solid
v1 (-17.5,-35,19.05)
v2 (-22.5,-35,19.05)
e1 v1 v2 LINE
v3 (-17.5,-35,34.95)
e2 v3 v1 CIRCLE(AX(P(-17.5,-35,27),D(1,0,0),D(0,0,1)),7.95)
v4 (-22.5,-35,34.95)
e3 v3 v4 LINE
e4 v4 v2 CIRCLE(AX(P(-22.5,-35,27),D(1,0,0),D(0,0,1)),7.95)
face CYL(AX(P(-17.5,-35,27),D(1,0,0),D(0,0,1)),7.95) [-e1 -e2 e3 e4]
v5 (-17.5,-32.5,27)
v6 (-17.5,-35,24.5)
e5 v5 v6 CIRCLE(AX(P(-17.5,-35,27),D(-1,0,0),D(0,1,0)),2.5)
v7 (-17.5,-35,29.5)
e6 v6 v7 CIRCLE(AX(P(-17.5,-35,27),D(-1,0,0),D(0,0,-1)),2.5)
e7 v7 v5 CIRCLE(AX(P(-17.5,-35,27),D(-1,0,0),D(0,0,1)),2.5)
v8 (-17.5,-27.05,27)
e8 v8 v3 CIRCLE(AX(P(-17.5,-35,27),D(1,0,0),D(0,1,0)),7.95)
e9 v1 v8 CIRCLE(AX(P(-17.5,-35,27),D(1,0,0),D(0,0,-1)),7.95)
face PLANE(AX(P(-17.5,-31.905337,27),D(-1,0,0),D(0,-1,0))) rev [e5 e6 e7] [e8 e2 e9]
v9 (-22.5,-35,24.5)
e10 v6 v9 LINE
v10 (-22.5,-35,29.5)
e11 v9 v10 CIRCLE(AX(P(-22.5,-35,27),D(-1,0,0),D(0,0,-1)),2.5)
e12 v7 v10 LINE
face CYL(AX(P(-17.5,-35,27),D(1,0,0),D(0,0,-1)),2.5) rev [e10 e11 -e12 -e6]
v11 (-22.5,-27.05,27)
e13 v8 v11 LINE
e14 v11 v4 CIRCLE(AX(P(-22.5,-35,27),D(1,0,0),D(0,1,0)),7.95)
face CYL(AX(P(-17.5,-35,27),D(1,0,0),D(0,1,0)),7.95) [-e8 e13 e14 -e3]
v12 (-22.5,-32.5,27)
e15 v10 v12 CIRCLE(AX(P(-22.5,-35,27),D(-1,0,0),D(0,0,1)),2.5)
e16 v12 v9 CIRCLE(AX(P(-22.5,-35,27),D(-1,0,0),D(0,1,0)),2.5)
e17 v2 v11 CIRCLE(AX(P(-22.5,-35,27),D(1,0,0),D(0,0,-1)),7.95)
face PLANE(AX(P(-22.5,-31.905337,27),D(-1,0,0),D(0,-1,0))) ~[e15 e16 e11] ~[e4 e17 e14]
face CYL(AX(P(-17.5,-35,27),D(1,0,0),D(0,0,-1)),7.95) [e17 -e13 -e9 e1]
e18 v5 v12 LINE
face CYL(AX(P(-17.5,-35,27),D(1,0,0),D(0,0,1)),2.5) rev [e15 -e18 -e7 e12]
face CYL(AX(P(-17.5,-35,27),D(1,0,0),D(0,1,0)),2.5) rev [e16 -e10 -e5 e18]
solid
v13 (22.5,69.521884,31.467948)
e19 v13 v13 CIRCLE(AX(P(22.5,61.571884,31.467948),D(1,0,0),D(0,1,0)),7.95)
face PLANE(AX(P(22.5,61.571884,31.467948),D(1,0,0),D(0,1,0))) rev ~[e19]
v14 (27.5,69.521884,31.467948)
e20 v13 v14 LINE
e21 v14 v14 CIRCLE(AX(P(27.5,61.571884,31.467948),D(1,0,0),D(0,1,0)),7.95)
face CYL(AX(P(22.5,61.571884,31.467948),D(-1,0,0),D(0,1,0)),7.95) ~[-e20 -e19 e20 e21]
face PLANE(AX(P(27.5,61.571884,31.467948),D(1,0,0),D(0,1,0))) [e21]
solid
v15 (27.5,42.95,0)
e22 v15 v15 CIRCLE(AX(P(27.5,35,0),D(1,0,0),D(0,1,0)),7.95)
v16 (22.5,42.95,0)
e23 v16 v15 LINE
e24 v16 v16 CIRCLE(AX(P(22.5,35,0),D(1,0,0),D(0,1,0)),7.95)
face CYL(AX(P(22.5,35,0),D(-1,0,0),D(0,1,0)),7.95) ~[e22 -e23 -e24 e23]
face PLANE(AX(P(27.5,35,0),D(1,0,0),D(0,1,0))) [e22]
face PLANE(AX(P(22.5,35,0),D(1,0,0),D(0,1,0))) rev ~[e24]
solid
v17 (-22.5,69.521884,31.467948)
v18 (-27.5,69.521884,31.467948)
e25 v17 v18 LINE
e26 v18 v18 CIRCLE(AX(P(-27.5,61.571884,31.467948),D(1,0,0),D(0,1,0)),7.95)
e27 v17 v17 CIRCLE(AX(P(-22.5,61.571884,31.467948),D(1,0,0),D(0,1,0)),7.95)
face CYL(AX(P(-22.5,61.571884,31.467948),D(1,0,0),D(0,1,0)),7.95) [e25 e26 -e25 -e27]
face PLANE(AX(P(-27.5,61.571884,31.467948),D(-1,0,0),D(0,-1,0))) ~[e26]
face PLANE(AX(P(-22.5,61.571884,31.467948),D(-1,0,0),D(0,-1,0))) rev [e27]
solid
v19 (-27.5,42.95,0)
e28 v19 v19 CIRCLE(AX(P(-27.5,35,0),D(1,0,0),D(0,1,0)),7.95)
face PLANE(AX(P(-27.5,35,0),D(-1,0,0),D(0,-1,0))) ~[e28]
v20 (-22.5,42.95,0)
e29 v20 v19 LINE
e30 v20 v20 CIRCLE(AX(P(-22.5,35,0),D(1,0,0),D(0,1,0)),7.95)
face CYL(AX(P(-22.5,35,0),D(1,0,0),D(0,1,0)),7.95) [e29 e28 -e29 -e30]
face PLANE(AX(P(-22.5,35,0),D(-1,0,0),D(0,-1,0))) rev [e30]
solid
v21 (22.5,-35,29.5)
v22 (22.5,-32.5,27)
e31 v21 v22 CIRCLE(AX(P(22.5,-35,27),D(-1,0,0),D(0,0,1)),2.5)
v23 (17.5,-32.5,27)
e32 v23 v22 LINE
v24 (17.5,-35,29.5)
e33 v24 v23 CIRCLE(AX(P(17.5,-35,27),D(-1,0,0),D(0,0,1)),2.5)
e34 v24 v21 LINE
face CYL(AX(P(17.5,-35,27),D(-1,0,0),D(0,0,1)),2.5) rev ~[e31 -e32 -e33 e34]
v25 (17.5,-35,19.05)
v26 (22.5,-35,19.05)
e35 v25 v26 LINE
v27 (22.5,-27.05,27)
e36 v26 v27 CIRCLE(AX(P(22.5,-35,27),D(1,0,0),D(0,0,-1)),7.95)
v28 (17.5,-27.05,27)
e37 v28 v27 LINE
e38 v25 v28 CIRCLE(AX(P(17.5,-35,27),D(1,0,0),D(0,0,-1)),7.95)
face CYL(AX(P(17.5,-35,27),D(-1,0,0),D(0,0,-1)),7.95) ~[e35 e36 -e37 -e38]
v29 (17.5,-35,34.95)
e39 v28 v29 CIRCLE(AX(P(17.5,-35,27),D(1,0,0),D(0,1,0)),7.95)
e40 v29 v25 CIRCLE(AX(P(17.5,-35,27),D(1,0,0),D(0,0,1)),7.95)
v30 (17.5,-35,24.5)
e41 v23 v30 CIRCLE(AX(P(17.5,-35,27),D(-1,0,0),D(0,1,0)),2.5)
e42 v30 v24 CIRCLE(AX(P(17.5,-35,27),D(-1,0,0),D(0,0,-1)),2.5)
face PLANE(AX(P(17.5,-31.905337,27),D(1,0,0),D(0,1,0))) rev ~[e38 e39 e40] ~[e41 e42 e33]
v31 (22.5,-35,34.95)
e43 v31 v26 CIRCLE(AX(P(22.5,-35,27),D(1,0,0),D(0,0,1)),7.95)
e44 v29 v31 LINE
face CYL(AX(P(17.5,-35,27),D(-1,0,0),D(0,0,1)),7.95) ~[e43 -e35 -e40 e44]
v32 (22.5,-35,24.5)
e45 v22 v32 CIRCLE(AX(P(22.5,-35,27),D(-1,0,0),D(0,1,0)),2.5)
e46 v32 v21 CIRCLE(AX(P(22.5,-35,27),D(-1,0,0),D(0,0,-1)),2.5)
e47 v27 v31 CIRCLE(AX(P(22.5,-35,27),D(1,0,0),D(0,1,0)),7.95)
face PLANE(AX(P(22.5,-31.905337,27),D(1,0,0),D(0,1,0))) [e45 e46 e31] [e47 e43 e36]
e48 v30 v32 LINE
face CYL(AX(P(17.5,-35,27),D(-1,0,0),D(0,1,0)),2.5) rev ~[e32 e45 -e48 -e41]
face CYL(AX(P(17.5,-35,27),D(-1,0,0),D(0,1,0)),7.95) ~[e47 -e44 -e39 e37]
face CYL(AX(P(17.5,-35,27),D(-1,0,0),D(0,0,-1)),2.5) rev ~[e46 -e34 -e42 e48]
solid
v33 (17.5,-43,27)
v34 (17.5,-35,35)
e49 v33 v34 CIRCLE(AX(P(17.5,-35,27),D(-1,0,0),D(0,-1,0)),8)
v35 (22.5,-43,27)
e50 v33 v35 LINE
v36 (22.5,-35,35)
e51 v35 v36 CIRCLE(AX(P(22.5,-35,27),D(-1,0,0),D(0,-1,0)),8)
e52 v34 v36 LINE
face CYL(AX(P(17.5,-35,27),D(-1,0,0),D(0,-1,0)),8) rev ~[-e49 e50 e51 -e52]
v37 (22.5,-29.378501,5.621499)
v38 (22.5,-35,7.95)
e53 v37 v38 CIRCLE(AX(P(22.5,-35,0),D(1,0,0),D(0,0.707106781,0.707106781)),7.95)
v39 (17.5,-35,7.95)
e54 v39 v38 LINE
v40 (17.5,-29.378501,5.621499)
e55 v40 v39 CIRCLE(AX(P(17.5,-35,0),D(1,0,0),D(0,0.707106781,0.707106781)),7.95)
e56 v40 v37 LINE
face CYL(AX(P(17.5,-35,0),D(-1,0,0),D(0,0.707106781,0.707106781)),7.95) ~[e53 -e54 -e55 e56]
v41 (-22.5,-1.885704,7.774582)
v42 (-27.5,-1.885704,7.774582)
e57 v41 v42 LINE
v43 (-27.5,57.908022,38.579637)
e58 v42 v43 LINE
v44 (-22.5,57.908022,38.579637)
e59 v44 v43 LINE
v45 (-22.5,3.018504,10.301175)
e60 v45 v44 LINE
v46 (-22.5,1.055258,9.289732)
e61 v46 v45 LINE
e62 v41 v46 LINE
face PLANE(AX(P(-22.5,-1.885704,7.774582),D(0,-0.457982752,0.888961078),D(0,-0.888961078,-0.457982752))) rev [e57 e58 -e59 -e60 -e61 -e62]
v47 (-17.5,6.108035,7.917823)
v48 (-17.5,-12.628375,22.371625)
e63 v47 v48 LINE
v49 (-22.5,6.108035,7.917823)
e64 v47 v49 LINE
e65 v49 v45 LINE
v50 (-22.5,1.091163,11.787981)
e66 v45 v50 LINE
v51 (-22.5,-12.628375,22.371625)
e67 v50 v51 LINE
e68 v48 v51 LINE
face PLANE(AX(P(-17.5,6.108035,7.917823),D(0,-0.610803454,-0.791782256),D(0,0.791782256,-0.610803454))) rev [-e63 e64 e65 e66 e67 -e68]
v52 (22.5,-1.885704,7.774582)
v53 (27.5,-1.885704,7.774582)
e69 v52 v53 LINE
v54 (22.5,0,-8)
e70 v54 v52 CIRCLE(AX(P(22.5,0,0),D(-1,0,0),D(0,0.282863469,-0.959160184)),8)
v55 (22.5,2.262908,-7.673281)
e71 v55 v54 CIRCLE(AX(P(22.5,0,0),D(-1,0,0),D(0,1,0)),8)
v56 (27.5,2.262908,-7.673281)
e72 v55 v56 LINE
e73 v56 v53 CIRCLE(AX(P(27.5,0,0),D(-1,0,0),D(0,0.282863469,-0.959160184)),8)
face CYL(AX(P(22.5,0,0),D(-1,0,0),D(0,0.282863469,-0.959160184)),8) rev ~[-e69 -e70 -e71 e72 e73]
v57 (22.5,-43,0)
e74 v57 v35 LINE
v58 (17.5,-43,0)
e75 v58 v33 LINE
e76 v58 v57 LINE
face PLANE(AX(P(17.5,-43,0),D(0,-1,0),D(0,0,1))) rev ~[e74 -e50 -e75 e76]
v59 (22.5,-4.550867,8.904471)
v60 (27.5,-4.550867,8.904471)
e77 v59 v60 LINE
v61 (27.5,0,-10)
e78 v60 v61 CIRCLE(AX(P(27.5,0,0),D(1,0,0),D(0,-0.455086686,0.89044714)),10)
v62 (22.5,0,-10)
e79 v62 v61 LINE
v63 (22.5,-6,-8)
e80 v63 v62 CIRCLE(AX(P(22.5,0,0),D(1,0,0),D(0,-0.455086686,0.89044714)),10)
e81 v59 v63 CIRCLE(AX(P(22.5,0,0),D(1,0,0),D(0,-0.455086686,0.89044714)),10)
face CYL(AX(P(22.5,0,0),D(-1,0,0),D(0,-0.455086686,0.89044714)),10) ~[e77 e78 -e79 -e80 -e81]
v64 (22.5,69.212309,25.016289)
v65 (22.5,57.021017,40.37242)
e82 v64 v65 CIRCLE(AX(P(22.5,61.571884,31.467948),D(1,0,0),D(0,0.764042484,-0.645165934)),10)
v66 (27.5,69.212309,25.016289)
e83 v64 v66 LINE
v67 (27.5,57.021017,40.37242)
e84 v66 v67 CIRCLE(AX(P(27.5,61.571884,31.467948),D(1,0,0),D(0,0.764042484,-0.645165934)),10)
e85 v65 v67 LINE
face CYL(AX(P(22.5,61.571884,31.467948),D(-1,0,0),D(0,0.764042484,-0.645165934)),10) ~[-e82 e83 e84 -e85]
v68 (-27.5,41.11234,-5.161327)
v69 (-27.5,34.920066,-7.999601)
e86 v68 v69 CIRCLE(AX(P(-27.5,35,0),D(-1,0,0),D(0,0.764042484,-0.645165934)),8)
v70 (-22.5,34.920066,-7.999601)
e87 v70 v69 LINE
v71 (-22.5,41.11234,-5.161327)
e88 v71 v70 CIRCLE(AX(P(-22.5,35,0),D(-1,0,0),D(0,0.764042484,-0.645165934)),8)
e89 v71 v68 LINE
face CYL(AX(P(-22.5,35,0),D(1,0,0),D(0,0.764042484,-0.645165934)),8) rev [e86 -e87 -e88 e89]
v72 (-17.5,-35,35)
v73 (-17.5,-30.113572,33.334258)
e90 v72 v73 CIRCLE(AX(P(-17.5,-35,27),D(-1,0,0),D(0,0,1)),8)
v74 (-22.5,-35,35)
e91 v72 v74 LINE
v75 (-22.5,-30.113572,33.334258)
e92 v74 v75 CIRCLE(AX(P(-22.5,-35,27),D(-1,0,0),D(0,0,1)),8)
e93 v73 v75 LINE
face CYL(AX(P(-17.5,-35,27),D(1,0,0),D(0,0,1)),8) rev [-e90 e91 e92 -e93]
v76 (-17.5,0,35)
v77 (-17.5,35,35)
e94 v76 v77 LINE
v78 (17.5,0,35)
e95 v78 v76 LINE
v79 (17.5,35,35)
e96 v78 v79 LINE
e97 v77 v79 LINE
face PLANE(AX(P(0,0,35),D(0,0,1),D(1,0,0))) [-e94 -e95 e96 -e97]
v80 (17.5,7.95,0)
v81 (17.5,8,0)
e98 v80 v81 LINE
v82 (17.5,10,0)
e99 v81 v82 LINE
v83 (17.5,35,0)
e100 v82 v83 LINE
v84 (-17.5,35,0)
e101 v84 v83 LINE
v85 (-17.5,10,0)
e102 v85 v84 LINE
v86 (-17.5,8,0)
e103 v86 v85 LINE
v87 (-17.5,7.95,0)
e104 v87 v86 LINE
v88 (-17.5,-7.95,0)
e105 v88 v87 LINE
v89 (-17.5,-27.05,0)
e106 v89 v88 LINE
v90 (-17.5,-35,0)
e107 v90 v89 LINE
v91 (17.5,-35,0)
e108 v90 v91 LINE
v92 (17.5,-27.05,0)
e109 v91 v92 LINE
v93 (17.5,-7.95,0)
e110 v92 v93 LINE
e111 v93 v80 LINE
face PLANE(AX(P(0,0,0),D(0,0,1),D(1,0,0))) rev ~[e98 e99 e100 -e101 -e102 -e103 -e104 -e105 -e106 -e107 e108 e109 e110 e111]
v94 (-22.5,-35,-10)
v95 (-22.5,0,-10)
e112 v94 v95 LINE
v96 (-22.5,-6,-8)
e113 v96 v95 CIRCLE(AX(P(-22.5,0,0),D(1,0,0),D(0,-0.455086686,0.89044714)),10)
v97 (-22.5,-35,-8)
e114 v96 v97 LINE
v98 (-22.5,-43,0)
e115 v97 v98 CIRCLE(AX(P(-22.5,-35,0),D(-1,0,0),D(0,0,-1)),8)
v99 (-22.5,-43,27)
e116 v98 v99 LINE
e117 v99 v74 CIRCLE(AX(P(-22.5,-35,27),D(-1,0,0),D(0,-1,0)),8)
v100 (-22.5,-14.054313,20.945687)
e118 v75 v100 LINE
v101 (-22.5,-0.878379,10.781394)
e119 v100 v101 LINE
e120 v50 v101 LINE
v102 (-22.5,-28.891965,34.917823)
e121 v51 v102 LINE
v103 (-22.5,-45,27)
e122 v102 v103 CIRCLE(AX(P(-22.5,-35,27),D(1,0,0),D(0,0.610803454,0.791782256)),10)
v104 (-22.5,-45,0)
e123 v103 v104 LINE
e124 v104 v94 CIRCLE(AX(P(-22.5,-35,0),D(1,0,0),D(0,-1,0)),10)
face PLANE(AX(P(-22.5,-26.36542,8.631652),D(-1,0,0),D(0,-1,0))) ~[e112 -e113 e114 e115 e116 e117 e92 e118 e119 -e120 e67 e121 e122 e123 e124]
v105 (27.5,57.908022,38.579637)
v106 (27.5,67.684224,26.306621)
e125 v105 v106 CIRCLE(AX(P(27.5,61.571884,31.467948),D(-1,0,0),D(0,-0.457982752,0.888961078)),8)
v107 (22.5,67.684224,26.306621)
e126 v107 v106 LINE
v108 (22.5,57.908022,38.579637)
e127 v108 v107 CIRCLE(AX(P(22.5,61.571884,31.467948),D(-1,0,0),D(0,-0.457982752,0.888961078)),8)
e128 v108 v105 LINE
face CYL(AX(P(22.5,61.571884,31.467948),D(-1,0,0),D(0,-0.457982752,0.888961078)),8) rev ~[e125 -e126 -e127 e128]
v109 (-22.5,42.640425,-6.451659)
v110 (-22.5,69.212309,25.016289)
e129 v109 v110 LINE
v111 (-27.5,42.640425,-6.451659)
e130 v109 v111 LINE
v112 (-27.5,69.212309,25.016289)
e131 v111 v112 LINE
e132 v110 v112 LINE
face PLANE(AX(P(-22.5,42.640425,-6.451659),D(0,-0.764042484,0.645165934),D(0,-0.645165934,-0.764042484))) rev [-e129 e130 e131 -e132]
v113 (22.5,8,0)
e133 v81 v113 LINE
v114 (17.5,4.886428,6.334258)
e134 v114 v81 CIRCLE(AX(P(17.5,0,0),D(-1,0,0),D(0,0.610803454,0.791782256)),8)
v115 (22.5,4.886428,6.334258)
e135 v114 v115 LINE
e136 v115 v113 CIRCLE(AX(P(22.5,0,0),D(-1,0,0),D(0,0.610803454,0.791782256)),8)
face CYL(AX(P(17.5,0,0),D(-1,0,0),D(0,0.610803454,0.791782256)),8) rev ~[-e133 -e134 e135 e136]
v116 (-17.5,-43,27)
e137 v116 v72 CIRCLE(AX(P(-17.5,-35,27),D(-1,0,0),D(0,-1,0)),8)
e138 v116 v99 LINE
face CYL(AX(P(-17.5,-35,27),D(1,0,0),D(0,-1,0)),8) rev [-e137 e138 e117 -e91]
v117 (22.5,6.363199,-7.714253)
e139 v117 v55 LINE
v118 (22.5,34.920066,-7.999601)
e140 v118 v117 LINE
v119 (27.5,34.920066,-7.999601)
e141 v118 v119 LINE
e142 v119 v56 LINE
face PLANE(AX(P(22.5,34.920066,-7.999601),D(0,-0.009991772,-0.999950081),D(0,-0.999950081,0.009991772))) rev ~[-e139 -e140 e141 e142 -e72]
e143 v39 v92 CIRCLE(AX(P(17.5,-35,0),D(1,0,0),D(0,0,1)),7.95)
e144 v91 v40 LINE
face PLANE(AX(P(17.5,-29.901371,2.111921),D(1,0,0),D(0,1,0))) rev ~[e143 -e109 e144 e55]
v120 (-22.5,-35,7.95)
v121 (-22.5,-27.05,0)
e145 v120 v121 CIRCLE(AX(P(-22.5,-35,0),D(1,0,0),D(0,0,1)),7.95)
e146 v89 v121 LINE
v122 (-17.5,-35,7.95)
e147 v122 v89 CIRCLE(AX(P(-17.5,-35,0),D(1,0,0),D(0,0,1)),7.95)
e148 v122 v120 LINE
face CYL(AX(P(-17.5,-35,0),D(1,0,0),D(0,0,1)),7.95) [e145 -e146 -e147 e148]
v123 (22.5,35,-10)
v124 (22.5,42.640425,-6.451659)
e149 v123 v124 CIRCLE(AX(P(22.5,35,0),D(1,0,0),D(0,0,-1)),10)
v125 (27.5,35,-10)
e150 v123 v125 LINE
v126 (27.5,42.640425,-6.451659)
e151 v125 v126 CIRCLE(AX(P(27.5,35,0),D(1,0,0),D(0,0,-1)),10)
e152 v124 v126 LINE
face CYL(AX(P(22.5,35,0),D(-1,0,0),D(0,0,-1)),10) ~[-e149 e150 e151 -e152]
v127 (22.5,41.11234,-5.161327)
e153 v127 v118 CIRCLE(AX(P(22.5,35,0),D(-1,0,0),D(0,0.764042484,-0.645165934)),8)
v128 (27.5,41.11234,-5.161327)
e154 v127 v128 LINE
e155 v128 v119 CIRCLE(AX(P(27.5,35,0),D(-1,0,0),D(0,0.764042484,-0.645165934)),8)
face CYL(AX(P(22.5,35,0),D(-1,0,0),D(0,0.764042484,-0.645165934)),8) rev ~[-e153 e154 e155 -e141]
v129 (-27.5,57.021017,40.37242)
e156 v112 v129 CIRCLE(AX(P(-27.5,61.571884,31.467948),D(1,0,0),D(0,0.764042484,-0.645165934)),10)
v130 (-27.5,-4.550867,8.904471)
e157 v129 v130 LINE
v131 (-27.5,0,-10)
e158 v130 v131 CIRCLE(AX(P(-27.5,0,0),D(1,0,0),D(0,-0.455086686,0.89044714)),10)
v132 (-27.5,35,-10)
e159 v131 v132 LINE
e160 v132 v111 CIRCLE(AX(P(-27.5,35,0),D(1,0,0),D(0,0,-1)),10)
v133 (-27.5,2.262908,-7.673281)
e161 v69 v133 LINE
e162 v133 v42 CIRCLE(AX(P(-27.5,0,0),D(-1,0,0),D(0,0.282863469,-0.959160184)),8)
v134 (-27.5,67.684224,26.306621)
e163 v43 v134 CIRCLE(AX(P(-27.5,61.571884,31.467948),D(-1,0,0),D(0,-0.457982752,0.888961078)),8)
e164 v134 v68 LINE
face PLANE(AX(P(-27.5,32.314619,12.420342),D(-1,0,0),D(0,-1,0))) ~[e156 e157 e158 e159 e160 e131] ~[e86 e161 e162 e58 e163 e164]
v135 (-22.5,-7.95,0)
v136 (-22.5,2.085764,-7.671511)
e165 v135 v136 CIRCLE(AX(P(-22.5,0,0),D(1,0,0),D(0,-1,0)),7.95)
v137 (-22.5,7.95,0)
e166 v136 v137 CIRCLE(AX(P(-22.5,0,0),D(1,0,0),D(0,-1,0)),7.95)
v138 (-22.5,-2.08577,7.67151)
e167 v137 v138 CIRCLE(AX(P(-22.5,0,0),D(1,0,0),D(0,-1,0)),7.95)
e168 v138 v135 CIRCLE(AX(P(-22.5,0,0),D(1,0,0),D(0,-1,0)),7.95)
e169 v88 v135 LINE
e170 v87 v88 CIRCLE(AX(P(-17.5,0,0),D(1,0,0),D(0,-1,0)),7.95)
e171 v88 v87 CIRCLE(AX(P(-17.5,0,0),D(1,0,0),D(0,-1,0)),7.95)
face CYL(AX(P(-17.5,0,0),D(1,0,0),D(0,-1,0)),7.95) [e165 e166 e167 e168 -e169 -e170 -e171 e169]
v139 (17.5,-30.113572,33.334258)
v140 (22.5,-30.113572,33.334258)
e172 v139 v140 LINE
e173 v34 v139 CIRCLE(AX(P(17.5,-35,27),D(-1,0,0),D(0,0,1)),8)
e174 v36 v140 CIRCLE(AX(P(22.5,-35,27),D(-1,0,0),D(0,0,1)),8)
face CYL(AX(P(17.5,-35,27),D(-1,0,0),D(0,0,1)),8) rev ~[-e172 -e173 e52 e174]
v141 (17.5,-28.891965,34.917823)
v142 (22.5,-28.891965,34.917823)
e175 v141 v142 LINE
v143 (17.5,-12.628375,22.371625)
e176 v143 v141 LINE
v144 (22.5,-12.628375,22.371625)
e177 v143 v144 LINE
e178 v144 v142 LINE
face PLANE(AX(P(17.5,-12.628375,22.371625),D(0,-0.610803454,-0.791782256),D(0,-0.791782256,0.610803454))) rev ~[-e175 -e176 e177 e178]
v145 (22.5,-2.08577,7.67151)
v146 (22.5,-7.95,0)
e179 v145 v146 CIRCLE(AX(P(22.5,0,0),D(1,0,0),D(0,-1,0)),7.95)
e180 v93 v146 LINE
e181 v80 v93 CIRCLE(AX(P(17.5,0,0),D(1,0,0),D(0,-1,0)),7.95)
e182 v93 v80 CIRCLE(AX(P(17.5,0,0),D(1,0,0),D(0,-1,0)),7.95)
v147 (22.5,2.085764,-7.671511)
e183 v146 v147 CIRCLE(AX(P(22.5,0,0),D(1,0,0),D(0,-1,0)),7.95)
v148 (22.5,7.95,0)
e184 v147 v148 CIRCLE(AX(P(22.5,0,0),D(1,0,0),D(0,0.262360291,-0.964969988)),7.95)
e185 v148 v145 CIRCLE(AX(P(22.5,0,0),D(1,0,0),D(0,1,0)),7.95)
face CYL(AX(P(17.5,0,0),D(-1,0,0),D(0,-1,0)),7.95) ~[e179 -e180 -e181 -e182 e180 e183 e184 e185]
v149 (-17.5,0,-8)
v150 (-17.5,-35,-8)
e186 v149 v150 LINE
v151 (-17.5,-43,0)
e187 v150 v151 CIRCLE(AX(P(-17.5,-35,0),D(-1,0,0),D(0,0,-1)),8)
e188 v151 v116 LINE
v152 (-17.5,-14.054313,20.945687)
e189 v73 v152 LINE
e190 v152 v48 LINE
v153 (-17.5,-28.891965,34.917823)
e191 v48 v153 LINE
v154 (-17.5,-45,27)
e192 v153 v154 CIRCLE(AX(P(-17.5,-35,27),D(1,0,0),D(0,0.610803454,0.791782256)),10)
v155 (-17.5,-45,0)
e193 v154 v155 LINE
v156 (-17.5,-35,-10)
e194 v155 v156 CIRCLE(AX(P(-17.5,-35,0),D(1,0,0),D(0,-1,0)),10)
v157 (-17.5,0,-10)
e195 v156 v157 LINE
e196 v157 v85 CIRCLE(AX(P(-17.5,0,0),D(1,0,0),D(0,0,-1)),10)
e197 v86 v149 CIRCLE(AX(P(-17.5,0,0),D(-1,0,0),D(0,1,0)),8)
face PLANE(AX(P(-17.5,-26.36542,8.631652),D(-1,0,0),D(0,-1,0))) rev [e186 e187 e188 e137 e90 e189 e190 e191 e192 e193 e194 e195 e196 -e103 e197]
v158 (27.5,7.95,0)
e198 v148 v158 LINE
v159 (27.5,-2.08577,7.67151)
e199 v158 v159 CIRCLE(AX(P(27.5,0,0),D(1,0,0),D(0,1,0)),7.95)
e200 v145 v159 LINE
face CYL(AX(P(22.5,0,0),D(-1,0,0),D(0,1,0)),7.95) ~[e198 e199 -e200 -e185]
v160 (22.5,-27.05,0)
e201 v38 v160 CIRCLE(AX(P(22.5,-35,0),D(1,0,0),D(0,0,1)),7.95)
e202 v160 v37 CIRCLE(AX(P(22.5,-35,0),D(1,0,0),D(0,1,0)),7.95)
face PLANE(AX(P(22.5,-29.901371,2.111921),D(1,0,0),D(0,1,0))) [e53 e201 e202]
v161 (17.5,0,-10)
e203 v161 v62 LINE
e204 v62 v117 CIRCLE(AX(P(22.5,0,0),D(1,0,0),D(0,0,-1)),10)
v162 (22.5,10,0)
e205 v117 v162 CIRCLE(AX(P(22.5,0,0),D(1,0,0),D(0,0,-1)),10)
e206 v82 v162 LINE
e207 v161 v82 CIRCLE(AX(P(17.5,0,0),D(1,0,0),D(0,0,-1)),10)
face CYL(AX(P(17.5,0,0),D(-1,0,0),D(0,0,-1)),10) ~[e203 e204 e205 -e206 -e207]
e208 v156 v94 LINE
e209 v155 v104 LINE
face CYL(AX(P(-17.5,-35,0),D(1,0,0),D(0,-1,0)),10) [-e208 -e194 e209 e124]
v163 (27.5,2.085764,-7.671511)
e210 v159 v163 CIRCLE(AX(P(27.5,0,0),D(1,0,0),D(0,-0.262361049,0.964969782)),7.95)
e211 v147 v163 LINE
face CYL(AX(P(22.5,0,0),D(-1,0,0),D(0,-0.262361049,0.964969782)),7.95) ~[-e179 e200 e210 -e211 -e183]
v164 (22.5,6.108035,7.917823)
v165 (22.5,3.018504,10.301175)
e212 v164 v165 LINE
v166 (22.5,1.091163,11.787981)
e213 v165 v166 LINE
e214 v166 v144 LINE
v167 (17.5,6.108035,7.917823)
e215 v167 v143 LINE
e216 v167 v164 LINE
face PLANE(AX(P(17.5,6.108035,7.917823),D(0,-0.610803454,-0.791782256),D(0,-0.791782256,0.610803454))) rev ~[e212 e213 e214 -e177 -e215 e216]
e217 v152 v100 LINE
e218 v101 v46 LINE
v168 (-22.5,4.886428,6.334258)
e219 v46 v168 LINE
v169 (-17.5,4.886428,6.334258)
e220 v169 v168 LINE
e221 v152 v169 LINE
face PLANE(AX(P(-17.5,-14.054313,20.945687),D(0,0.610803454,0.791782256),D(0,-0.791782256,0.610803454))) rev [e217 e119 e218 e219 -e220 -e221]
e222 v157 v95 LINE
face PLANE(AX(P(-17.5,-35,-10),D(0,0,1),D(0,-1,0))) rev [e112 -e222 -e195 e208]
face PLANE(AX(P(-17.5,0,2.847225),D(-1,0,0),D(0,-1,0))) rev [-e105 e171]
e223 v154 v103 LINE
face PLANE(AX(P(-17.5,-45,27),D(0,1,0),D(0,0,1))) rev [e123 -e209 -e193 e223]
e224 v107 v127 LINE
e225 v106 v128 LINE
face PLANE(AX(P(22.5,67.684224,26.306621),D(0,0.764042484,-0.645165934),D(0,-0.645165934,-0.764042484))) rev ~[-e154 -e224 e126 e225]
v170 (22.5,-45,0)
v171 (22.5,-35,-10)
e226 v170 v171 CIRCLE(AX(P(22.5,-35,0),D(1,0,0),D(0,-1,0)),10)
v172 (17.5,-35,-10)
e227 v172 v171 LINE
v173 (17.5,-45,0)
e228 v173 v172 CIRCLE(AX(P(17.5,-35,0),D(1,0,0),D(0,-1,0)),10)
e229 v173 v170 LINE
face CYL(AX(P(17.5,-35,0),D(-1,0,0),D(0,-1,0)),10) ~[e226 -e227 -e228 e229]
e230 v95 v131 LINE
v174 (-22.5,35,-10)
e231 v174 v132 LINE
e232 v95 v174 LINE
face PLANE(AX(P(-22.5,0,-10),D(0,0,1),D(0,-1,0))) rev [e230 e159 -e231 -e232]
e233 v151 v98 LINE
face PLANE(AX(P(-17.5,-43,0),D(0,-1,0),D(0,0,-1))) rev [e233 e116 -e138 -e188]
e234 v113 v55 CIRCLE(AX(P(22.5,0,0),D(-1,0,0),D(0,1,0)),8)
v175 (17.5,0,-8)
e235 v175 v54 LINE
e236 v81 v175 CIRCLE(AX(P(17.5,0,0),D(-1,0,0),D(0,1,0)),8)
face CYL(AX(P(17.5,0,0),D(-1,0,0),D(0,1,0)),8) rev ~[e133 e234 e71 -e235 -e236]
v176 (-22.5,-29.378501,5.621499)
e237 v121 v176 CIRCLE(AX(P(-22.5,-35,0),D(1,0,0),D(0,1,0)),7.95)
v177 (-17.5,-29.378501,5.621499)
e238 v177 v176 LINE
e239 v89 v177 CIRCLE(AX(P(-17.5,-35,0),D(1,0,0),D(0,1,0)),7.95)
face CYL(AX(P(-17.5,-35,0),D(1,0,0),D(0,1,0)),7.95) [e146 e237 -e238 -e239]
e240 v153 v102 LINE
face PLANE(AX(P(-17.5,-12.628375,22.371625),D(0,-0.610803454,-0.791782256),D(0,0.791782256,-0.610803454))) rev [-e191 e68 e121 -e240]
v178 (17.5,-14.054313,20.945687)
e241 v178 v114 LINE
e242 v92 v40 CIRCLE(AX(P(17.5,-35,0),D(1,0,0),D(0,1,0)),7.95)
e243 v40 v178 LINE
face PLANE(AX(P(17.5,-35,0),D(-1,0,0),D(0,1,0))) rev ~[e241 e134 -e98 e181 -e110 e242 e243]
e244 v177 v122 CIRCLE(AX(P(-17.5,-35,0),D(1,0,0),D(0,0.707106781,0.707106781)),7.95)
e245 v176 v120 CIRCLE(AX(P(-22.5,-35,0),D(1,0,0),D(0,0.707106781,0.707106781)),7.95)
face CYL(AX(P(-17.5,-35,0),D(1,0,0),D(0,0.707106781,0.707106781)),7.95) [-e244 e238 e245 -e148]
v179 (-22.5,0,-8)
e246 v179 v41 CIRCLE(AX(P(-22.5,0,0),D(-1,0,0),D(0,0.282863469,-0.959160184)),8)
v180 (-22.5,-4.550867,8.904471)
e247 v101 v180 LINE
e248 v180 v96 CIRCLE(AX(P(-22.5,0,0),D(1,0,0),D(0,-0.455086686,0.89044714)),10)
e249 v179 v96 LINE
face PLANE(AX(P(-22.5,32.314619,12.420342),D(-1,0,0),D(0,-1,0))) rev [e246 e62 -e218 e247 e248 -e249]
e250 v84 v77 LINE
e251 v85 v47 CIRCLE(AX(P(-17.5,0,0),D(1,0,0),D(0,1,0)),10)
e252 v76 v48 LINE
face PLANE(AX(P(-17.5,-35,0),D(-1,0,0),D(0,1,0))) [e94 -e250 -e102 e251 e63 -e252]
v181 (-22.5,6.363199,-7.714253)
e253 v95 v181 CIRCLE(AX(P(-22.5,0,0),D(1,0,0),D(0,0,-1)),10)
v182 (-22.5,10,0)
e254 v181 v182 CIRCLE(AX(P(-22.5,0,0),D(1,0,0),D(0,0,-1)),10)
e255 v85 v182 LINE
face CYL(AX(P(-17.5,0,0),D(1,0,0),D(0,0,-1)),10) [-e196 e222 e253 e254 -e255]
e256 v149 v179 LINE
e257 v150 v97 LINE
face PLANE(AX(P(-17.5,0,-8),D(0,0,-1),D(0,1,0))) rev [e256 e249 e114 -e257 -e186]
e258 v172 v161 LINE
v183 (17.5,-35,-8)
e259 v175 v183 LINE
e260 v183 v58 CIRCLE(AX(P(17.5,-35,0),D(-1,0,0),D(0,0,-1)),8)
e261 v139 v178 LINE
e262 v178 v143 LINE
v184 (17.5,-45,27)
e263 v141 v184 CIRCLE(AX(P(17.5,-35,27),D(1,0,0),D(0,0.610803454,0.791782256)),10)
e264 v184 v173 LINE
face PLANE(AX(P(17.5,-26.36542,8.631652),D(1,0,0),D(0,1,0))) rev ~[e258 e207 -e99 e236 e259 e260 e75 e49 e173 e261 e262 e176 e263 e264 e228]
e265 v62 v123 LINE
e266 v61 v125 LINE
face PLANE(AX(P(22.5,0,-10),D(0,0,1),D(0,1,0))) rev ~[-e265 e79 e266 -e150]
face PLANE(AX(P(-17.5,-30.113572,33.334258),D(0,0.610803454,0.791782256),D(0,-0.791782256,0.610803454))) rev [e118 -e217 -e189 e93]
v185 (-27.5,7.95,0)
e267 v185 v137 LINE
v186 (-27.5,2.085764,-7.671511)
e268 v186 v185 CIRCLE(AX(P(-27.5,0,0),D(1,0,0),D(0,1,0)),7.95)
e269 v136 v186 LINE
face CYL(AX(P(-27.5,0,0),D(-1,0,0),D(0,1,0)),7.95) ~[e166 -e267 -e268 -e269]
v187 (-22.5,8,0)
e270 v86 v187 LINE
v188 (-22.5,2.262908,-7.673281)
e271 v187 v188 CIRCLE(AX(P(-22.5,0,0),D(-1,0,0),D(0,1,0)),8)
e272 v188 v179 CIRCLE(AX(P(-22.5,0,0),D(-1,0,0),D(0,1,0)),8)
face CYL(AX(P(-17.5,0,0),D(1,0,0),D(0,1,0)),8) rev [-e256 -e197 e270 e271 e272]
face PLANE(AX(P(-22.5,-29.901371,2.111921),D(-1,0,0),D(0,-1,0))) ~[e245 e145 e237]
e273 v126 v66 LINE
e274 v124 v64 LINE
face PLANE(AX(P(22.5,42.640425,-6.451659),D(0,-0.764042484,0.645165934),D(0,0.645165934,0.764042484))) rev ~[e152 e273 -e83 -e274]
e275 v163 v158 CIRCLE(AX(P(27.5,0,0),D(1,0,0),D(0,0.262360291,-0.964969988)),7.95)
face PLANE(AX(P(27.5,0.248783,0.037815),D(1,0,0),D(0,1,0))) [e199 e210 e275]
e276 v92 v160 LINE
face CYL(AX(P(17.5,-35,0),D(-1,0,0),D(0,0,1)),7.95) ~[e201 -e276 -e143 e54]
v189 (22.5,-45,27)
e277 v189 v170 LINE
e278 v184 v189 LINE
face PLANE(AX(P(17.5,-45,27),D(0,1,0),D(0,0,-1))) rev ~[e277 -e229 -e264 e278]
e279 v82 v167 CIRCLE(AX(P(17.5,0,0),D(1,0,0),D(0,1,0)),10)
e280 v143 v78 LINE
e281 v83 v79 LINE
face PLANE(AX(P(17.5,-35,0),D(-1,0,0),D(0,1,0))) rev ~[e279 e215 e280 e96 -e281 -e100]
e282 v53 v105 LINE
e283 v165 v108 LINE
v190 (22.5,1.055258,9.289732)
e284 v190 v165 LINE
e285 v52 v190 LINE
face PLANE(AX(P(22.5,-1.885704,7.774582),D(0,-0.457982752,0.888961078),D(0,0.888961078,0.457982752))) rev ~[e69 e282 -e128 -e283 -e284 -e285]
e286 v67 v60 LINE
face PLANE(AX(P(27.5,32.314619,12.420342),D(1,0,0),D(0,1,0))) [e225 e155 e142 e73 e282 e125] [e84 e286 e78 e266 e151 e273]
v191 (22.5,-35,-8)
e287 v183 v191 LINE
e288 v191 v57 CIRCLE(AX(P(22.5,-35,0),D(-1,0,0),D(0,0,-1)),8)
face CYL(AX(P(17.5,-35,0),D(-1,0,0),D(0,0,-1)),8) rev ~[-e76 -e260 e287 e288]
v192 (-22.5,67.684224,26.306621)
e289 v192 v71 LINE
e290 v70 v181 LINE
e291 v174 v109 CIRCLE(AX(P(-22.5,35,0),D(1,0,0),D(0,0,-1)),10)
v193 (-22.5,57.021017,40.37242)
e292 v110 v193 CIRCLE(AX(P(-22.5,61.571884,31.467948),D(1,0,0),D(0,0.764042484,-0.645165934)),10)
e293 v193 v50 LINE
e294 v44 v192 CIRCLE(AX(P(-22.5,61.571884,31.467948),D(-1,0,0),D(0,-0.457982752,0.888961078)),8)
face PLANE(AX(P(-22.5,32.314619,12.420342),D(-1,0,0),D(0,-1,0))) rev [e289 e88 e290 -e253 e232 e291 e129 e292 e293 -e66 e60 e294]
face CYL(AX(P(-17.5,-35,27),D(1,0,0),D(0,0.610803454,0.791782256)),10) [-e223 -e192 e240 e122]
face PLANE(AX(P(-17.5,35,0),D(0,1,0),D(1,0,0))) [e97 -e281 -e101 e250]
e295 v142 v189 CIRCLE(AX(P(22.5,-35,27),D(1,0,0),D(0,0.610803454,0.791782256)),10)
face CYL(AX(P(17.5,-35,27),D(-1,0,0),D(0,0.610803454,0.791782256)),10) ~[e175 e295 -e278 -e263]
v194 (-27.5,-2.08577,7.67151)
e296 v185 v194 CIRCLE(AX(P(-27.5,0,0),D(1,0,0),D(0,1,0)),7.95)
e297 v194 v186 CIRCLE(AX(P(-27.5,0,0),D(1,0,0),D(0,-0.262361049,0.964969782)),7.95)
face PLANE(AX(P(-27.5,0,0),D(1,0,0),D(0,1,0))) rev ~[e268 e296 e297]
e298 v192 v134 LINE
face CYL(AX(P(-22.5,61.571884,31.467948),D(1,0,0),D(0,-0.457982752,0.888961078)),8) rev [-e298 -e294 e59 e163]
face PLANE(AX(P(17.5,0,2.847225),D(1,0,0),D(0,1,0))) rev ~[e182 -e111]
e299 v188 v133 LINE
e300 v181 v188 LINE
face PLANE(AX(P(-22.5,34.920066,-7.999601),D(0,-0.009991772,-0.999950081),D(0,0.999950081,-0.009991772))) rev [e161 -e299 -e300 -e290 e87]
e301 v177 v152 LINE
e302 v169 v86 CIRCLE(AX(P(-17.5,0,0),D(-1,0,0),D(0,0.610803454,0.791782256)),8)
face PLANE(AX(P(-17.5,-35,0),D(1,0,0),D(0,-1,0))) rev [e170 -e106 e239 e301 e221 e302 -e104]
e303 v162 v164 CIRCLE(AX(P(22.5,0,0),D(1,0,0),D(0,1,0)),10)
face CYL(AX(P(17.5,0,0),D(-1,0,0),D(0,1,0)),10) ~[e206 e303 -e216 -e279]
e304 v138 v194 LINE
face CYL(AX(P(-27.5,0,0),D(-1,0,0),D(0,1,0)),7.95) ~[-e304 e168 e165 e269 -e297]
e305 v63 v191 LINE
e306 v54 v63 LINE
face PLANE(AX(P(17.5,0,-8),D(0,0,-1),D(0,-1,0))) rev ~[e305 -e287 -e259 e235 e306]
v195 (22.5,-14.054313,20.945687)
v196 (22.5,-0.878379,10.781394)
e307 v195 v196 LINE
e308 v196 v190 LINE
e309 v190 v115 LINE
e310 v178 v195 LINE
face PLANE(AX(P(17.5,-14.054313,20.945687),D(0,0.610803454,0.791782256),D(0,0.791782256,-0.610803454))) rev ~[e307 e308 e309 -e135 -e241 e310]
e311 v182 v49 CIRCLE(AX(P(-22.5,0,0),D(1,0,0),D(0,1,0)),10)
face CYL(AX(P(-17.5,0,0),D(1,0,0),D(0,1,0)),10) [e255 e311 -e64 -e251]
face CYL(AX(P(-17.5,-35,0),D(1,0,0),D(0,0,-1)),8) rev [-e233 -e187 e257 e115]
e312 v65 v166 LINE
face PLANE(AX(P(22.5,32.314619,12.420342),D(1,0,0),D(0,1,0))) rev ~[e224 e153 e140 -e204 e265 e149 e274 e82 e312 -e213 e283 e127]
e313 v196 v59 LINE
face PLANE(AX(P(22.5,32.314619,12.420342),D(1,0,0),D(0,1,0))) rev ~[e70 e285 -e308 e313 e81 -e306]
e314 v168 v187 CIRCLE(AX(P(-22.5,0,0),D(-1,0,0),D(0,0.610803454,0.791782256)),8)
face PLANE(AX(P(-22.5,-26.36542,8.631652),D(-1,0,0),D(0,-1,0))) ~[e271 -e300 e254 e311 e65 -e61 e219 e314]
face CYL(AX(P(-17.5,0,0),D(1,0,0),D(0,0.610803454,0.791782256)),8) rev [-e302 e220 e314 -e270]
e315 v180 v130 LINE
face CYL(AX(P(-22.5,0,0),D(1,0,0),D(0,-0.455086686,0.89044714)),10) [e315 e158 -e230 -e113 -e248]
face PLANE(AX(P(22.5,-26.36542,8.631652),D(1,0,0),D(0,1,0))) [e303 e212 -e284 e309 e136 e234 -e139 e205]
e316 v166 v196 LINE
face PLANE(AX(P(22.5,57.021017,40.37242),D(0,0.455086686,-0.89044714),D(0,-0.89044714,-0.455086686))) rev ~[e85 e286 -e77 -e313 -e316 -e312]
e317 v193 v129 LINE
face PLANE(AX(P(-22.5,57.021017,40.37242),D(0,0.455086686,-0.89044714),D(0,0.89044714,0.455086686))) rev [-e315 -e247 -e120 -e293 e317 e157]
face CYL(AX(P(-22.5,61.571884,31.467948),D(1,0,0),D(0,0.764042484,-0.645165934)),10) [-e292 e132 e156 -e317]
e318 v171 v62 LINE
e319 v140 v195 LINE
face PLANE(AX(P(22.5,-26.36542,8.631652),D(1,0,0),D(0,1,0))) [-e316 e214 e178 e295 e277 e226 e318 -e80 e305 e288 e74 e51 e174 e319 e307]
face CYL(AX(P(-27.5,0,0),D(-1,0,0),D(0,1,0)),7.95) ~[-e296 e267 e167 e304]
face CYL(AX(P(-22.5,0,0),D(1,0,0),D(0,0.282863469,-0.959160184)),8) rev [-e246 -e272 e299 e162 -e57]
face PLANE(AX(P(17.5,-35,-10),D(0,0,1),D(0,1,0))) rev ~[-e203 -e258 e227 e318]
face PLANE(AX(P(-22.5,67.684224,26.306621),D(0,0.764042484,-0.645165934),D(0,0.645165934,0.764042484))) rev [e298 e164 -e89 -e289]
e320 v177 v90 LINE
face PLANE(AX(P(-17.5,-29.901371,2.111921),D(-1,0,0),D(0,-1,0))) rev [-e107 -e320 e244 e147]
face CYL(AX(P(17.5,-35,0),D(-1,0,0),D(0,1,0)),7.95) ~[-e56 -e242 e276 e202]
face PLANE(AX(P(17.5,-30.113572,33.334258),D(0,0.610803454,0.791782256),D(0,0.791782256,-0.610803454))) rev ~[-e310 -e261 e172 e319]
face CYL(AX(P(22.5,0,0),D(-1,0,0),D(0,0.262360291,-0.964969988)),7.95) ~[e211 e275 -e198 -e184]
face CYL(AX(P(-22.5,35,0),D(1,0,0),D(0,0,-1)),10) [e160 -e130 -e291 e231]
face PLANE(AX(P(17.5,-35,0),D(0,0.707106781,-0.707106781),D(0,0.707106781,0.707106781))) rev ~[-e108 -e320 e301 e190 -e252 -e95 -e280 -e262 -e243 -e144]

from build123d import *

# Parameters (mm, degrees)
F0_W            = 35
F0_H            = 70
F1_DEPTH        = 35
F3_DEPTH        = 35.001
F5_DEPTH        = 5
F6_DEPTH        = 5
F8_R            = 7.95
F9_DEPTH        = 5
F9_COPIES_COUNT = 2
F9_COPIES_PITCH = 61.032778


# Not quite as in the source:
# - a pattern or mirror of a feature is missing from the dataset's text; its kind, count and spacing are read off the source's solid
# - a feature names something its author has since deleted; it is built from what else it names


with BuildPart() as f1:
    # F0 (on Top) → F1 (new body)
    with BuildSketch(Plane.XY):
        Rectangle(F0_W, F0_H)
    extrude(amount=F1_DEPTH)

    # F2 (on face) → F3 (cut, through all)
    with BuildSketch(Plane.YZ.offset(17.5)):
        Polygon((-35, 0), (0, 35), (-35, 35), align=None)
    extrude(amount=-F3_DEPTH, mode=Mode.SUBTRACT)

    # F4 (on face) → F5 (join)
    with BuildSketch(Plane.YZ.offset(17.5)):
        with BuildLine():
            Line((2.5, 0), (7.95, 0))
            ThreePointArc((7.95, 0), (0, 7.95), (-7.95, 0))
            Line((-7.95, 0), (-2.5, 0))
            ThreePointArc((-2.5, 0), (0, 2.5), (2.5, 0))
        make_face()
        with BuildLine():
            ThreePointArc((-7.95, 0), (0, -7.95), (7.95, 0))
            Line((7.95, 0), (2.5, 0))
            ThreePointArc((2.5, 0), (0, -2.5), (-2.5, 0))
            Line((-2.5, 0), (-7.95, 0))
        make_face()
        with BuildLine():
            Line((-2.5, 0), (2.5, 0))
            ThreePointArc((2.5, 0), (0, 2.5), (-2.5, 0))
        make_face()
        with BuildLine():
            ThreePointArc((-2.5, 0), (0, -2.5), (2.5, 0))
            Line((2.5, 0), (-2.5, 0))
        make_face()
        with BuildLine():
            Line((10, 0), (8, 0))
            ThreePointArc((8, 0), (5.6568542495, -5.6568542495), (0, -8))
            Line((0, -8), (-35, -8))
            ThreePointArc((-35, -8), (-40.6568542495, -5.6568542495), (-43, 0))
            Line((-43, 0), (-43, 27))
            ThreePointArc((-43, 27), (-40.6568542495, 32.6568542495), (-35, 35))
            ThreePointArc((-35, 35), (-32.4187274801, 34.5721220393), (-30.1135723657, 33.3342580445))
            Line((-30.1135723657, 33.3342580445), (-14.0543132631, 20.9456867369))
            Line((-14.0543132631, 20.9456867369), (-12.6283754499, 22.3716245501))
            Line((-12.6283754499, 22.3716245501), (-28.8919654571, 34.9178225556))
            ThreePointArc((-28.8919654571, 34.9178225556), (-39.4113294238, 35.9744176811), (-45, 27))
            Line((-45, 27), (-45, 0))
            ThreePointArc((-45, 0), (-42.0710678119, -7.0710678119), (-35, -10))
            Line((-35, -10), (0, -10))
            ThreePointArc((0, -10), (7.0710678119, -7.0710678119), (10, 0))
        make_face()
        with BuildLine():
            ThreePointArc((4.8864276343, 6.3342580445), (7.1795341449, 3.5290635391), (8, 0))
            Line((8, 0), (10, 0))
            ThreePointArc((10, 0), (8.9744176811, 4.4113294238), (6.1080345429, 7.9178225556))
            Line((6.1080345429, 7.9178225556), (-12.6283754499, 22.3716245501))
            Line((-12.6283754499, 22.3716245501), (-14.0543132631, 20.9456867369))
            Line((-14.0543132631, 20.9456867369), (4.8864276343, 6.3342580445))
        make_face()
        with BuildLine():
            Line((-32.5, 0), (-27.05, 0))
            ThreePointArc((-27.05, 0), (-27.6551577165, 3.0423332873), (-29.3785010896, 5.6214989104))
            Line((-29.3785010896, 5.6214989104), (-33.232233047, 1.767766953))
            ThreePointArc((-33.232233047, 1.767766953), (-32.6903011687, 0.9567085809), (-32.5, 0))
        make_face()
        with BuildLine():
            ThreePointArc((-35, 7.95), (-40.6214989104, -5.6214989104), (-27.05, 0))
            Line((-27.05, 0), (-32.5, 0))
            ThreePointArc((-32.5, 0), (-36.767766953, -1.767766953), (-35, 2.5))
            Line((-35, 2.5), (-35, 7.95))
        make_face()
        with BuildLine():
            Line((-33.232233047, 1.767766953), (-29.3785010896, 5.6214989104))
            ThreePointArc((-29.3785010896, 5.6214989104), (-31.9576667127, 7.3448422835), (-35, 7.95))
            Line((-35, 7.95), (-35, 2.5))
            ThreePointArc((-35, 2.5), (-34.0432914191, 2.3096988313), (-33.232233047, 1.767766953))
        make_face()
        with BuildLine():
            Line((-35, 0), (-32.5, 0))
            ThreePointArc((-32.5, 0), (-32.6903011687, 0.9567085809), (-33.232233047, 1.767766953))
            Line((-33.232233047, 1.767766953), (-35, 0))
        make_face()
        with BuildLine():
            ThreePointArc((-35, 2.5), (-36.767766953, -1.767766953), (-32.5, 0))
            Line((-32.5, 0), (-35, 0))
            Line((-35, 0), (-35, 2.5))
        make_face()
        with BuildLine():
            Line((-35, 0), (-33.232233047, 1.767766953))
            ThreePointArc((-33.232233047, 1.767766953), (-34.0432914191, 2.3096988313), (-35, 2.5))
            Line((-35, 2.5), (-35, 0))
        make_face()
    extrude(amount=F5_DEPTH)

    # F4 (on face) → F6 (join)
    with BuildSketch(Plane.YZ.offset(17.5)):
        with BuildLine():
            Line((6.1080345429, 7.9178225556), (-28.8919654571, 34.9178225556))
            ThreePointArc((-28.8919654571, 34.9178225556), (-39.4113294238, 35.9744176811), (-45, 27))
            Line((-45, 27), (-45, 0))
            ThreePointArc((-45, 0), (-42.0710678119, -7.0710678119), (-35, -10))
            Line((-35, -10), (0, -10))
            ThreePointArc((0, -10), (9.4651525491, -3.2265906499), (6.1080345429, 7.9178225556))
        make_face()
        with BuildLine():
            ThreePointArc((-43, 27), (-38.5290635391, 34.1795341449), (-30.1135723657, 33.3342580445))
            Line((-30.1135723657, 33.3342580445), (4.8864276343, 6.3342580445))
            ThreePointArc((4.8864276343, 6.3342580445), (7.5721220393, -2.5812725199), (0, -8))
            Line((0, -8), (-35, -8))
            ThreePointArc((-35, -8), (-40.6568542495, -5.6568542495), (-43, 0))
            Line((-43, 0), (-43, 27))
        make_face(mode=Mode.SUBTRACT)
    extrude(amount=F6_DEPTH)

    # F7: F1, F5 across plane


with BuildPart() as f5:
    # F4 (on face) → F5, piece 2 (new body)
    with BuildSketch(Plane.YZ.offset(17.5)):
        with BuildLine():
            Line((-35, 24.5), (-35, 19.05))
            ThreePointArc((-35, 19.05), (-29.3785010896, 21.3785010896), (-27.05, 27))
            ThreePointArc((-27.05, 27), (-29.3785010896, 32.6214989104), (-35, 34.95))
            Line((-35, 34.95), (-35, 29.5))
            ThreePointArc((-35, 29.5), (-33.232233047, 28.767766953), (-32.5, 27))
            ThreePointArc((-32.5, 27), (-33.232233047, 25.232233047), (-35, 24.5))
        make_face()
        with BuildLine():
            ThreePointArc((-35, 34.95), (-42.95, 27), (-35, 19.05))
            Line((-35, 19.05), (-35, 24.5))
            ThreePointArc((-35, 24.5), (-37.5, 27), (-35, 29.5))
            Line((-35, 29.5), (-35, 34.95))
        make_face()
    extrude(amount=F5_DEPTH)


with BuildPart() as f1_1:
    add(f1.part)
    add(f1.part.mirror(Plane.YZ))
    add(f5.part.mirror(Plane.YZ))

    # F8 (on face) → F9, piece 3 (join)
    with BuildSketch(Plane.YZ.offset(22.5)):
        with BuildLine():
            Line((57.0210172366, 40.3724198063), (-4.5508668554, 8.9044713972))
            ThreePointArc((-4.5508668554, 8.9044713972), (-9.7222608989, -2.3404365007), (0, -10))
            Line((0, -10), (35, -10))
            ThreePointArc((35, -10), (39.2120901339, -9.0696359742), (42.640424841, -6.4516593408))
            Line((42.640424841, -6.4516593408), (69.2123089329, 25.0162890683))
            ThreePointArc((69.2123089329, 25.0162890683), (69.4038078625, 37.6857430384), (57.0210172366, 40.3724198063))
        make_face()
        with BuildLine():
            ThreePointArc((57.9080220764, 38.5796370363), (67.8293190298, 36.4523749557), (67.6842239647, 26.3066209364))
            Line((67.6842239647, 26.3066209364), (41.1123398728, -5.1613274726))
            ThreePointArc((41.1123398728, -5.1613274726), (38.3333809066, -7.2724529378), (34.920065821, -7.999600648))
            Line((34.920065821, -7.999600648), (2.2629077537, -7.6732814687))
            ThreePointArc((2.2629077537, -7.6732814687), (-7.7262338594, -2.0749241795), (-1.8857040225, 7.7745816826))
            Line((-1.8857040225, 7.7745816826), (57.9080220764, 38.5796370363))
        make_face(mode=Mode.SUBTRACT)
        with BuildLine():
            ThreePointArc((7.95, 0), (4.8280754869, 6.3160262106), (-2.0857703378, 7.6715097665))
            ThreePointArc((-2.0857703378, 7.6715097665), (-7.671510585, -2.0857673274), (2.0857643171, -7.6715114035))
            ThreePointArc((2.0857643171, -7.6715114035), (6.316024316, -4.8280779654), (7.95, 0))
        make_face()
    extrude(amount=F9_DEPTH)

    # F9_copies: F9 ×2


with BuildPart() as f9:
    # F8 (on face) → F9 (new body)
    with BuildSketch(Plane.YZ.offset(22.5)):
        with Locations((35, 0)):
            Circle(F8_R)
    extrude(amount=F9_DEPTH)


with BuildPart() as f9b:
    # F8 (on face) → F9, piece 2 (new body)
    with BuildSketch(Plane.YZ.offset(22.5)):
        with Locations((61.571884092, 31.467948409)):
            Circle(F8_R)
    extrude(amount=F9_DEPTH)


with BuildPart() as f1_2:
    add(f1_1.part)
    with Locations(*[Vector(-0.8192319205, -0.5734623444, 0) * (i * F9_COPIES_PITCH) for i in range(1, F9_COPIES_COUNT)]):
        add(f9.part)



with BuildPart() as f1_3:
    add(f1_2.part)

    add(f5.part)  # F10 merges F5
    # F10: F1, F9, F9b across plane
    add(f1_2.part.mirror(Plane.YZ))
    add(f9.part.mirror(Plane.YZ))
    add(f9b.part.mirror(Plane.YZ))


solid = Compound([f9.part, f9b.part, f1_3.part])
